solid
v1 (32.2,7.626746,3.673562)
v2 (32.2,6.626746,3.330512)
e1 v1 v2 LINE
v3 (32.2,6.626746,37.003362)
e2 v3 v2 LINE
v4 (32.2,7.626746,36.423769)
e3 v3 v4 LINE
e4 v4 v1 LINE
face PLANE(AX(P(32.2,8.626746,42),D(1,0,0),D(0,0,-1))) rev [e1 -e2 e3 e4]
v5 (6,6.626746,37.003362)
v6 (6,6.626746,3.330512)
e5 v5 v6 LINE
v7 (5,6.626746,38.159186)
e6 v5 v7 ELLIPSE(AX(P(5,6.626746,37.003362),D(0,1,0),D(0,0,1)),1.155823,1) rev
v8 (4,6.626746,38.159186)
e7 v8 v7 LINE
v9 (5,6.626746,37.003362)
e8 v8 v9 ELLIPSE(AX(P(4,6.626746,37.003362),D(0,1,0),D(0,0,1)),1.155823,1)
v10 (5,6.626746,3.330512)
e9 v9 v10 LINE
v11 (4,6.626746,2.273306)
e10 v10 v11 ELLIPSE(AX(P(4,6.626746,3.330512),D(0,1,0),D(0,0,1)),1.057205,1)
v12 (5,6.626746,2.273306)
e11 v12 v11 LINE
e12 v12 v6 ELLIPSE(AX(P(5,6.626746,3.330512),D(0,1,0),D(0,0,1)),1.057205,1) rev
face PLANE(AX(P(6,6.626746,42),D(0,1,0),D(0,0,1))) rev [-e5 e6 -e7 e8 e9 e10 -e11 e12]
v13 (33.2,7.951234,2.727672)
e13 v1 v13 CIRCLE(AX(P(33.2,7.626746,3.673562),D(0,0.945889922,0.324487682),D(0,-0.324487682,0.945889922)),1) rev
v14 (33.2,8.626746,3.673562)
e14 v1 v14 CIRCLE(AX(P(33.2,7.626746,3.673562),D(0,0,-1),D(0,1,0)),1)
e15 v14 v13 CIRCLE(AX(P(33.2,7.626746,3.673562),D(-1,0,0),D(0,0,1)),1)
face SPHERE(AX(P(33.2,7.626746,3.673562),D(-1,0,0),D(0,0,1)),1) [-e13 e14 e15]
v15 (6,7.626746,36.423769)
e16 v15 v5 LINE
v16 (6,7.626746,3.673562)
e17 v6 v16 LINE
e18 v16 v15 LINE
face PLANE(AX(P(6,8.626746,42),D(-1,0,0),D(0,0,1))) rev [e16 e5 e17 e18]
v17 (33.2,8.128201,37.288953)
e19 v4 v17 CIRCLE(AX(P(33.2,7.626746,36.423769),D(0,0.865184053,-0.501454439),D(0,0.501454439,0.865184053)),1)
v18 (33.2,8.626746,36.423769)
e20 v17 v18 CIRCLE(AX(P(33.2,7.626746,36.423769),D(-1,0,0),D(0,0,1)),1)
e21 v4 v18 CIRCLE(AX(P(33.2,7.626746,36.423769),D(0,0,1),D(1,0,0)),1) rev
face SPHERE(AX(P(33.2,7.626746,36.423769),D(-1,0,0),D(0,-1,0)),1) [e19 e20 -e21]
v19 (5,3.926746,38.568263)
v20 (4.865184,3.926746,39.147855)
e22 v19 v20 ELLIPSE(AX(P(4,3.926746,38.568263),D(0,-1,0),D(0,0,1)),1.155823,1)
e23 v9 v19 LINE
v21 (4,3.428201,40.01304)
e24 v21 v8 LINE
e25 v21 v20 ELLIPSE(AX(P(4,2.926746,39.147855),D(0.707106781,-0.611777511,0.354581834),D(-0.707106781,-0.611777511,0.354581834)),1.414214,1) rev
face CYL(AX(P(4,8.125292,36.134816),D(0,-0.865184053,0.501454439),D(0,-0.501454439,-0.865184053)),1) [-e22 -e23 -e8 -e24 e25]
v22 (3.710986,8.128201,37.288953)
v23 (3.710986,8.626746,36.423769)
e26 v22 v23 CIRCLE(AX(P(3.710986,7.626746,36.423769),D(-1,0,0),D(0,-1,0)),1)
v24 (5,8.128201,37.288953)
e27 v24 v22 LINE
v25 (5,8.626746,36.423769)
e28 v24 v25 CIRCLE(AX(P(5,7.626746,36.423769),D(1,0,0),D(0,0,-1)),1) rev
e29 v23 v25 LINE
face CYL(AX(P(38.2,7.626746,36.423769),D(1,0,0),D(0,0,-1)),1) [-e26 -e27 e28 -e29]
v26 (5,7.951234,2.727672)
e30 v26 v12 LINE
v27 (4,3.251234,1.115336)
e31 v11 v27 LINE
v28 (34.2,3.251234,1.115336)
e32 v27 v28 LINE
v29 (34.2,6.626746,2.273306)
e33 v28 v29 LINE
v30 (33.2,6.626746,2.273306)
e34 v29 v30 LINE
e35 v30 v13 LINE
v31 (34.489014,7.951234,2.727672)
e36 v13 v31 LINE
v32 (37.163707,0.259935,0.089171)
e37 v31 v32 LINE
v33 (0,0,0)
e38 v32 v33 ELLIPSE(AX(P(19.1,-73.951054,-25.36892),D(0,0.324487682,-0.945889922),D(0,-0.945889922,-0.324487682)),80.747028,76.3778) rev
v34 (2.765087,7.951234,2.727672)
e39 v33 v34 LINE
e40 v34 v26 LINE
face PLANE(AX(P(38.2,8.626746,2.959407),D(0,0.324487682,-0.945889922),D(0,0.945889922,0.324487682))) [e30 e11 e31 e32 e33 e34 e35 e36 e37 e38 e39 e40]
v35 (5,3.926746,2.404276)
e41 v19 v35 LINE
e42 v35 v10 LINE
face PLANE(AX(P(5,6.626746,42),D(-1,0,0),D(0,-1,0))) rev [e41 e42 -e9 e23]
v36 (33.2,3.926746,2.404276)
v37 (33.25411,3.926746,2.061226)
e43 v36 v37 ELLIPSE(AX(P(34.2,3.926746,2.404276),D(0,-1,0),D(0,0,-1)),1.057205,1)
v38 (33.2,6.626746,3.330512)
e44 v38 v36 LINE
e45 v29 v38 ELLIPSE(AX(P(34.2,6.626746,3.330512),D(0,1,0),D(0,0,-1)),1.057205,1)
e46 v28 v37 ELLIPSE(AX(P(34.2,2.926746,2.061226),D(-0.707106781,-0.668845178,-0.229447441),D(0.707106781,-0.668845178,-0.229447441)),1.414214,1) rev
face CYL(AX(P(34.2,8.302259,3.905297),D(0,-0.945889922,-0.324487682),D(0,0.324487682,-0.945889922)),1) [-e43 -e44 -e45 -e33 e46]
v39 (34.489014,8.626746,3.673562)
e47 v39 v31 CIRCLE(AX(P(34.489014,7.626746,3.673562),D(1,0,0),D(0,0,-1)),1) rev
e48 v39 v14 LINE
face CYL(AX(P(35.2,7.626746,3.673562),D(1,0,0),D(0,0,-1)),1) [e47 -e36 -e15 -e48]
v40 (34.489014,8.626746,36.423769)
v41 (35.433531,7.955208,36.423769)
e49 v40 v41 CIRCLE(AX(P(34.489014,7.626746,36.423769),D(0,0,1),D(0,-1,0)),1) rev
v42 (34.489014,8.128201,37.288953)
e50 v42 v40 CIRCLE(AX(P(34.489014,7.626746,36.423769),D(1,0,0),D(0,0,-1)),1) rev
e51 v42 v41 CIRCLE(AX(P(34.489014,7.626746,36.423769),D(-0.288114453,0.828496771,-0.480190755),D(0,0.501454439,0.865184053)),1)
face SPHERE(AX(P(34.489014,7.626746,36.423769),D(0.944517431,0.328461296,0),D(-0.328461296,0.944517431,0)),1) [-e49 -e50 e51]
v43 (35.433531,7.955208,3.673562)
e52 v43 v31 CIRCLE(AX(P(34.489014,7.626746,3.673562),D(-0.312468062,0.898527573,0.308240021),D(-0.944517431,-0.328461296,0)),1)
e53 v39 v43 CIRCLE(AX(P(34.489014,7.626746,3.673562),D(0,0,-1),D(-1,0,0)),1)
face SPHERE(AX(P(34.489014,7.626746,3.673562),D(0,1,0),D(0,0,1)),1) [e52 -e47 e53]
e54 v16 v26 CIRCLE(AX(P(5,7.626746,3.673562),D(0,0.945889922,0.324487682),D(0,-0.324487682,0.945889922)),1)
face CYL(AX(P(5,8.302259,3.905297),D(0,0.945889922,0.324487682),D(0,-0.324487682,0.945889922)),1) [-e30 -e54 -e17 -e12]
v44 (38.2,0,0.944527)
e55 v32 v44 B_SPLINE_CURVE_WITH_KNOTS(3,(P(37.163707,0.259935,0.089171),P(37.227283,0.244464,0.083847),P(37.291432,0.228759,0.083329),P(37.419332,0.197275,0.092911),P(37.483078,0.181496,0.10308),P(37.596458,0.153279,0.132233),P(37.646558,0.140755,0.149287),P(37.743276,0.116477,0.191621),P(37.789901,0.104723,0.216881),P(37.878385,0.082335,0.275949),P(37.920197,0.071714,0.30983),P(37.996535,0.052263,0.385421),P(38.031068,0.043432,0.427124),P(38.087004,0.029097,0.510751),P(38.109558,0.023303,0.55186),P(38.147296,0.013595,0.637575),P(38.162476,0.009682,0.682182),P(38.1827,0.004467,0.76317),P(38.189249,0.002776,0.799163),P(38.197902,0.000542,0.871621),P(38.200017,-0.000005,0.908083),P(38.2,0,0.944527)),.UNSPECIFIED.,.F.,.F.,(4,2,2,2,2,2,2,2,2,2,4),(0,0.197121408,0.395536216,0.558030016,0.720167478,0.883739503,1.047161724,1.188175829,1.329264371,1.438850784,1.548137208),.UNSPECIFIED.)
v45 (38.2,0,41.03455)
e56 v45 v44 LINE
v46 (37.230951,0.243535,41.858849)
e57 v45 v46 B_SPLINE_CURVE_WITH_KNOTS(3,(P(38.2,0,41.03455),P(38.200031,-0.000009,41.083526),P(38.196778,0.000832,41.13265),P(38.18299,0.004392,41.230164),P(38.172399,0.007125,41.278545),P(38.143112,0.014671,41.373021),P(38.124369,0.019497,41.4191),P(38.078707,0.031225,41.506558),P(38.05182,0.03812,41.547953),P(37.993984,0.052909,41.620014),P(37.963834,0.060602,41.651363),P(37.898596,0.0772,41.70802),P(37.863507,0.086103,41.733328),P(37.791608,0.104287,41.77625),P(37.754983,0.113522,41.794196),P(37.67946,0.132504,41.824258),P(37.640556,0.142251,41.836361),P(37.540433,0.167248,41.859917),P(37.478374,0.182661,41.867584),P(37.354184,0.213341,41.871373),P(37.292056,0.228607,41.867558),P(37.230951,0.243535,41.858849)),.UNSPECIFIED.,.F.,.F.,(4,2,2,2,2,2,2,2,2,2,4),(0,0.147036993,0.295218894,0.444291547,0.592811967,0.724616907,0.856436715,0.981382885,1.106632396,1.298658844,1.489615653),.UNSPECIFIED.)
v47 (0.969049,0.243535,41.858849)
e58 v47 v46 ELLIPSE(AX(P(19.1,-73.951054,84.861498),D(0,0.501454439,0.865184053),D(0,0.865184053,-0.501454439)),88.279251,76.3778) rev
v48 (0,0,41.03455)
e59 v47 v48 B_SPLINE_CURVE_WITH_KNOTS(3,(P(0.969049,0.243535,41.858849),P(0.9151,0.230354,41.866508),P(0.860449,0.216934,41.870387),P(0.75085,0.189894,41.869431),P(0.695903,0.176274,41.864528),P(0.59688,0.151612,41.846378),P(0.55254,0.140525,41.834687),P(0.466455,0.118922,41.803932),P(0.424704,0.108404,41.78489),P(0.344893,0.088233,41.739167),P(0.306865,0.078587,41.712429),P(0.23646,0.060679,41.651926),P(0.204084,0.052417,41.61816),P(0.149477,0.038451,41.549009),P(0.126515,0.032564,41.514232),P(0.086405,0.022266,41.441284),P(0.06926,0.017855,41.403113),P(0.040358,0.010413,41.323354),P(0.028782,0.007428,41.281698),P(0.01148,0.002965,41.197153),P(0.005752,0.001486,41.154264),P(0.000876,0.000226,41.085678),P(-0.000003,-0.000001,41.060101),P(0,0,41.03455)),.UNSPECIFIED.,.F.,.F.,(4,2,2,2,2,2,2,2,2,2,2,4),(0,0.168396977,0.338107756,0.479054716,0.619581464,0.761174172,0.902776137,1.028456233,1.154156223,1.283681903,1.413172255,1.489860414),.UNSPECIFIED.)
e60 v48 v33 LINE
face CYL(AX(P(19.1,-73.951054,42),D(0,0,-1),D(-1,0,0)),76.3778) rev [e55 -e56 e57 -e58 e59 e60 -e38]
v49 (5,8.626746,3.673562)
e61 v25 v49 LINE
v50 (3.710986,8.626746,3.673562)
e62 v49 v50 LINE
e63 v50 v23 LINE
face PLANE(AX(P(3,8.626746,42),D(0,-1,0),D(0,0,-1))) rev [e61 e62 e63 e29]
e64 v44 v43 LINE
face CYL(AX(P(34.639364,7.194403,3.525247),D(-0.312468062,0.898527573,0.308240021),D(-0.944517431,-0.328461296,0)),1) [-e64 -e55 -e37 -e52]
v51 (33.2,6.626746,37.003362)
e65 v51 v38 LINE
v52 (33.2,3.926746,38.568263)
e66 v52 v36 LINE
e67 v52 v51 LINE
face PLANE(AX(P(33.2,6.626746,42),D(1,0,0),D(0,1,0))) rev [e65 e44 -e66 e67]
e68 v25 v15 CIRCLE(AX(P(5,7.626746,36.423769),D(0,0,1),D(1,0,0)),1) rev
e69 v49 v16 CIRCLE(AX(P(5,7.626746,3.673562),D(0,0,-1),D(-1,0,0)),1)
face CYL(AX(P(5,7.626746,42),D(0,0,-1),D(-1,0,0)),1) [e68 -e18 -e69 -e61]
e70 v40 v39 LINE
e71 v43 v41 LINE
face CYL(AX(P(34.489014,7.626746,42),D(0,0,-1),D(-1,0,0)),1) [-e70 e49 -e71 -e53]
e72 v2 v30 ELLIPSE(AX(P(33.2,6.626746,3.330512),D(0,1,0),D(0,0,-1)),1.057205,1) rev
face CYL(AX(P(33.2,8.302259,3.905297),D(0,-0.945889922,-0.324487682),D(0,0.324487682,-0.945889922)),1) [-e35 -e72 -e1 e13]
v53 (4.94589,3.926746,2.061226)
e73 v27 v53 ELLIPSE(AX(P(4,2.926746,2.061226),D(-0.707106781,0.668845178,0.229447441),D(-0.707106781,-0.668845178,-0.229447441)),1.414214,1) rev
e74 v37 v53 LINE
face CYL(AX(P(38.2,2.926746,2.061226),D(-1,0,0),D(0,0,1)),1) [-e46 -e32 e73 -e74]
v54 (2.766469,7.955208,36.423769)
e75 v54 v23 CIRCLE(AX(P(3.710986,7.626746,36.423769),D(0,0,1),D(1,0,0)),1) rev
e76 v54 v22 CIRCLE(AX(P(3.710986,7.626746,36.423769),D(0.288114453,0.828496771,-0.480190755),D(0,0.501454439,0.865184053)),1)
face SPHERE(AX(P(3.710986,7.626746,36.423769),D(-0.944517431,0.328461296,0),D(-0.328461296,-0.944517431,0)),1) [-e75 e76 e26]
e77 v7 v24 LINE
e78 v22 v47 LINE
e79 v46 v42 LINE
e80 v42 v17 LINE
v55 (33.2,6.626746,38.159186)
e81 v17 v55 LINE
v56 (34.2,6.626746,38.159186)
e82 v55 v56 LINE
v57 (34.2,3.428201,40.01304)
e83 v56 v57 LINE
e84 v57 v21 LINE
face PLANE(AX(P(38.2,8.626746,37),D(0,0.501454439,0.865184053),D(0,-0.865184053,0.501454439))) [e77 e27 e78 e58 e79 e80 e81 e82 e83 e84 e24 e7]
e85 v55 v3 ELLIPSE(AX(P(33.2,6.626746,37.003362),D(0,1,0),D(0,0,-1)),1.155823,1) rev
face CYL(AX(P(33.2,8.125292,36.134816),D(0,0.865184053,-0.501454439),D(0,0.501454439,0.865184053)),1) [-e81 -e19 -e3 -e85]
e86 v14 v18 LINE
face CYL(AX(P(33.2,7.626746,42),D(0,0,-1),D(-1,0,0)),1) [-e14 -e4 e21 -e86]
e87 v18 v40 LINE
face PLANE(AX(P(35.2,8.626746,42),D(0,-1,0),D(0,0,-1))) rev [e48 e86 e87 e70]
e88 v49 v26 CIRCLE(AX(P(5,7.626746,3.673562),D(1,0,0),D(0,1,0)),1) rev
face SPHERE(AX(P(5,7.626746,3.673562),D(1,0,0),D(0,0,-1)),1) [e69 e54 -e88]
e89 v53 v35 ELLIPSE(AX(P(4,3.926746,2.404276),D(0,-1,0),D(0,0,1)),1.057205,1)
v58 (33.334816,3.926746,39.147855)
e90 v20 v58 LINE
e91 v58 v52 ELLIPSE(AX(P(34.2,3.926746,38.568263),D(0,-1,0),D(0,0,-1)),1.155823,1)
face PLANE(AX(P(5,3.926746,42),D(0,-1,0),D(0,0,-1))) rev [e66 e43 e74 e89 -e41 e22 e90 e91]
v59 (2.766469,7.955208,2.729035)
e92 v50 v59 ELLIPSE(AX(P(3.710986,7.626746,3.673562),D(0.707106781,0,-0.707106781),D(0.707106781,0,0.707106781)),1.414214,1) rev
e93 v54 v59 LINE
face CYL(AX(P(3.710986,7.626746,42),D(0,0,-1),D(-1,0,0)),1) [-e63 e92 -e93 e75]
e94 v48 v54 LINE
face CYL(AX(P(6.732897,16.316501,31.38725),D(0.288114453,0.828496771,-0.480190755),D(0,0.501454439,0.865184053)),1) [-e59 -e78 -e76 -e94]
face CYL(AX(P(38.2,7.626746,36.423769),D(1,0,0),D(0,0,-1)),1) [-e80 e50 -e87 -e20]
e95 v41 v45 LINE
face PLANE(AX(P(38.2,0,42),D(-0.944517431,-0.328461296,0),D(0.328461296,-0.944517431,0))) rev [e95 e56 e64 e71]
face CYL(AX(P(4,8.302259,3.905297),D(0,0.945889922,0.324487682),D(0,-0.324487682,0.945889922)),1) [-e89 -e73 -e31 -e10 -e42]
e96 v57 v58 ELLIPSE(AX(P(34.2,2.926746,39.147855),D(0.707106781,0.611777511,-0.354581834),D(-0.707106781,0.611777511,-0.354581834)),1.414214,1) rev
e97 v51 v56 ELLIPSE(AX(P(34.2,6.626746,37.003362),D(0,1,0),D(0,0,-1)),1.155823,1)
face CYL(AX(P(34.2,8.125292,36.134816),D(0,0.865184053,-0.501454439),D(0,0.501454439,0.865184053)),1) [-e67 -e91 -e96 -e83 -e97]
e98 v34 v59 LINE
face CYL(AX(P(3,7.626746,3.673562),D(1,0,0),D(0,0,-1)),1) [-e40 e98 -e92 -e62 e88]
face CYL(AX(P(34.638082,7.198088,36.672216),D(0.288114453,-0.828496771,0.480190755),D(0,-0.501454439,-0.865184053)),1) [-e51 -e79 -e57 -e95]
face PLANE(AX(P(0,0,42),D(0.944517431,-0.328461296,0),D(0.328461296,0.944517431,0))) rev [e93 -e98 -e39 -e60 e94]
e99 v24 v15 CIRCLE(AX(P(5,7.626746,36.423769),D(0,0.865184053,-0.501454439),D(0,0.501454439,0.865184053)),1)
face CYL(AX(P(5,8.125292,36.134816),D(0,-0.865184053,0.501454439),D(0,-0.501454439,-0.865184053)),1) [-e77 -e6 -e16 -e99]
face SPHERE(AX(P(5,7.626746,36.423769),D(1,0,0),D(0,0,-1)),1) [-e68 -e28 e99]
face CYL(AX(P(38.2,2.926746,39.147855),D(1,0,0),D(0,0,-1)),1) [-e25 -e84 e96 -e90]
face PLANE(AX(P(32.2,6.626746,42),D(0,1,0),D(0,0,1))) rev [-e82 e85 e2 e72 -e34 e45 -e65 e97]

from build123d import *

# Parameters (mm, degrees)
BOSS_EXTRUDE1_DEPTH = 42
CUT_EXTRUDE2_DEPTH  = 58.425262324
FILLET1_R           = 1


with BuildPart() as part:
    # Sketch1 → Boss-Extrude1 (new body)
    with BuildSketch(Plane.XY):
        with BuildLine():
            Line((0, 0), (3, 8.626746371))
            Line((3, 8.626746371), (6, 8.626746371))
            Line((6, 8.626746371), (6, 6.626746371))
            Line((6, 6.626746371), (5, 6.626746371))
            Line((5, 6.626746371), (5, 3.926746371))
            Line((5, 3.926746371), (33.2, 3.926746371))
            Line((33.2, 3.926746371), (33.2, 6.626746371))
            Line((33.2, 6.626746371), (32.2, 6.626746371))
            Line((32.2, 6.626746371), (32.2, 8.626746371))
            Line((32.2, 8.626746371), (35.2, 8.626746371))
            Line((35.2, 8.626746371), (38.2, 0))
            ThreePointArc((38.2, 0), (19.1, 2.426746371), (0, 0))
        make_face()
    extrude(amount=BOSS_EXTRUDE1_DEPTH)

    # Sketch5 → Cut-Extrude2 (cut, through all)
    with BuildSketch(Plane(origin=(0, 0, 0), x_dir=(0, 0, -1), z_dir=(1, 0, 0))):
        Polygon((-42, 0), (-42, 8.626746371), (-37, 8.626746371), align=None)
        Polygon((0, 0), (0, 8.626746371), (-2.959406662, 8.626746371), align=None)
    extrude(amount=CUT_EXTRUDE2_DEPTH, mode=Mode.SUBTRACT)

    # Fillet1
    fillet1_edges = [part.edges().sort_by_distance(p)[0] for p in [
        (32.2, 7.626746371, 2.616356509),
        (33.2, 5.276746371, 1.81018865),
        (36.7, 4.313373185, 1.479703331),
        (33.7, 8.626746371, 2.959406662),
        (3, 8.626746371, 19.979703331),
        (4.5, 8.626746371, 2.959406662),
        (19.1, 3.926746371, 1.347070943),
        (5, 5.276746371, 1.81018865),
        (6, 7.626746371, 2.616356509),
        (36.7, 4.313373185, 39.5),
        (1.5, 4.313373185, 39.5),
        (35.2, 8.626746371, 19.979703331),
        (6, 8.626746371, 19.979703331),
        (4.5, 8.626746371, 37),
        (6, 7.626746371, 37.57959279),
        (5, 5.276746371, 38.941635847),
        (32.2, 8.626746371, 19.979703331),
        (33.7, 8.626746371, 37),
        (32.2, 7.626746371, 37.57959279),
        (33.2, 5.276746371, 38.941635847),
        (19.1, 3.926746371, 39.724086114),
    ]]
    fillet(fillet1_edges, radius=FILLET1_R - 0.0001)  # a hair under: the kernel refuses the full size


solid = part.part
